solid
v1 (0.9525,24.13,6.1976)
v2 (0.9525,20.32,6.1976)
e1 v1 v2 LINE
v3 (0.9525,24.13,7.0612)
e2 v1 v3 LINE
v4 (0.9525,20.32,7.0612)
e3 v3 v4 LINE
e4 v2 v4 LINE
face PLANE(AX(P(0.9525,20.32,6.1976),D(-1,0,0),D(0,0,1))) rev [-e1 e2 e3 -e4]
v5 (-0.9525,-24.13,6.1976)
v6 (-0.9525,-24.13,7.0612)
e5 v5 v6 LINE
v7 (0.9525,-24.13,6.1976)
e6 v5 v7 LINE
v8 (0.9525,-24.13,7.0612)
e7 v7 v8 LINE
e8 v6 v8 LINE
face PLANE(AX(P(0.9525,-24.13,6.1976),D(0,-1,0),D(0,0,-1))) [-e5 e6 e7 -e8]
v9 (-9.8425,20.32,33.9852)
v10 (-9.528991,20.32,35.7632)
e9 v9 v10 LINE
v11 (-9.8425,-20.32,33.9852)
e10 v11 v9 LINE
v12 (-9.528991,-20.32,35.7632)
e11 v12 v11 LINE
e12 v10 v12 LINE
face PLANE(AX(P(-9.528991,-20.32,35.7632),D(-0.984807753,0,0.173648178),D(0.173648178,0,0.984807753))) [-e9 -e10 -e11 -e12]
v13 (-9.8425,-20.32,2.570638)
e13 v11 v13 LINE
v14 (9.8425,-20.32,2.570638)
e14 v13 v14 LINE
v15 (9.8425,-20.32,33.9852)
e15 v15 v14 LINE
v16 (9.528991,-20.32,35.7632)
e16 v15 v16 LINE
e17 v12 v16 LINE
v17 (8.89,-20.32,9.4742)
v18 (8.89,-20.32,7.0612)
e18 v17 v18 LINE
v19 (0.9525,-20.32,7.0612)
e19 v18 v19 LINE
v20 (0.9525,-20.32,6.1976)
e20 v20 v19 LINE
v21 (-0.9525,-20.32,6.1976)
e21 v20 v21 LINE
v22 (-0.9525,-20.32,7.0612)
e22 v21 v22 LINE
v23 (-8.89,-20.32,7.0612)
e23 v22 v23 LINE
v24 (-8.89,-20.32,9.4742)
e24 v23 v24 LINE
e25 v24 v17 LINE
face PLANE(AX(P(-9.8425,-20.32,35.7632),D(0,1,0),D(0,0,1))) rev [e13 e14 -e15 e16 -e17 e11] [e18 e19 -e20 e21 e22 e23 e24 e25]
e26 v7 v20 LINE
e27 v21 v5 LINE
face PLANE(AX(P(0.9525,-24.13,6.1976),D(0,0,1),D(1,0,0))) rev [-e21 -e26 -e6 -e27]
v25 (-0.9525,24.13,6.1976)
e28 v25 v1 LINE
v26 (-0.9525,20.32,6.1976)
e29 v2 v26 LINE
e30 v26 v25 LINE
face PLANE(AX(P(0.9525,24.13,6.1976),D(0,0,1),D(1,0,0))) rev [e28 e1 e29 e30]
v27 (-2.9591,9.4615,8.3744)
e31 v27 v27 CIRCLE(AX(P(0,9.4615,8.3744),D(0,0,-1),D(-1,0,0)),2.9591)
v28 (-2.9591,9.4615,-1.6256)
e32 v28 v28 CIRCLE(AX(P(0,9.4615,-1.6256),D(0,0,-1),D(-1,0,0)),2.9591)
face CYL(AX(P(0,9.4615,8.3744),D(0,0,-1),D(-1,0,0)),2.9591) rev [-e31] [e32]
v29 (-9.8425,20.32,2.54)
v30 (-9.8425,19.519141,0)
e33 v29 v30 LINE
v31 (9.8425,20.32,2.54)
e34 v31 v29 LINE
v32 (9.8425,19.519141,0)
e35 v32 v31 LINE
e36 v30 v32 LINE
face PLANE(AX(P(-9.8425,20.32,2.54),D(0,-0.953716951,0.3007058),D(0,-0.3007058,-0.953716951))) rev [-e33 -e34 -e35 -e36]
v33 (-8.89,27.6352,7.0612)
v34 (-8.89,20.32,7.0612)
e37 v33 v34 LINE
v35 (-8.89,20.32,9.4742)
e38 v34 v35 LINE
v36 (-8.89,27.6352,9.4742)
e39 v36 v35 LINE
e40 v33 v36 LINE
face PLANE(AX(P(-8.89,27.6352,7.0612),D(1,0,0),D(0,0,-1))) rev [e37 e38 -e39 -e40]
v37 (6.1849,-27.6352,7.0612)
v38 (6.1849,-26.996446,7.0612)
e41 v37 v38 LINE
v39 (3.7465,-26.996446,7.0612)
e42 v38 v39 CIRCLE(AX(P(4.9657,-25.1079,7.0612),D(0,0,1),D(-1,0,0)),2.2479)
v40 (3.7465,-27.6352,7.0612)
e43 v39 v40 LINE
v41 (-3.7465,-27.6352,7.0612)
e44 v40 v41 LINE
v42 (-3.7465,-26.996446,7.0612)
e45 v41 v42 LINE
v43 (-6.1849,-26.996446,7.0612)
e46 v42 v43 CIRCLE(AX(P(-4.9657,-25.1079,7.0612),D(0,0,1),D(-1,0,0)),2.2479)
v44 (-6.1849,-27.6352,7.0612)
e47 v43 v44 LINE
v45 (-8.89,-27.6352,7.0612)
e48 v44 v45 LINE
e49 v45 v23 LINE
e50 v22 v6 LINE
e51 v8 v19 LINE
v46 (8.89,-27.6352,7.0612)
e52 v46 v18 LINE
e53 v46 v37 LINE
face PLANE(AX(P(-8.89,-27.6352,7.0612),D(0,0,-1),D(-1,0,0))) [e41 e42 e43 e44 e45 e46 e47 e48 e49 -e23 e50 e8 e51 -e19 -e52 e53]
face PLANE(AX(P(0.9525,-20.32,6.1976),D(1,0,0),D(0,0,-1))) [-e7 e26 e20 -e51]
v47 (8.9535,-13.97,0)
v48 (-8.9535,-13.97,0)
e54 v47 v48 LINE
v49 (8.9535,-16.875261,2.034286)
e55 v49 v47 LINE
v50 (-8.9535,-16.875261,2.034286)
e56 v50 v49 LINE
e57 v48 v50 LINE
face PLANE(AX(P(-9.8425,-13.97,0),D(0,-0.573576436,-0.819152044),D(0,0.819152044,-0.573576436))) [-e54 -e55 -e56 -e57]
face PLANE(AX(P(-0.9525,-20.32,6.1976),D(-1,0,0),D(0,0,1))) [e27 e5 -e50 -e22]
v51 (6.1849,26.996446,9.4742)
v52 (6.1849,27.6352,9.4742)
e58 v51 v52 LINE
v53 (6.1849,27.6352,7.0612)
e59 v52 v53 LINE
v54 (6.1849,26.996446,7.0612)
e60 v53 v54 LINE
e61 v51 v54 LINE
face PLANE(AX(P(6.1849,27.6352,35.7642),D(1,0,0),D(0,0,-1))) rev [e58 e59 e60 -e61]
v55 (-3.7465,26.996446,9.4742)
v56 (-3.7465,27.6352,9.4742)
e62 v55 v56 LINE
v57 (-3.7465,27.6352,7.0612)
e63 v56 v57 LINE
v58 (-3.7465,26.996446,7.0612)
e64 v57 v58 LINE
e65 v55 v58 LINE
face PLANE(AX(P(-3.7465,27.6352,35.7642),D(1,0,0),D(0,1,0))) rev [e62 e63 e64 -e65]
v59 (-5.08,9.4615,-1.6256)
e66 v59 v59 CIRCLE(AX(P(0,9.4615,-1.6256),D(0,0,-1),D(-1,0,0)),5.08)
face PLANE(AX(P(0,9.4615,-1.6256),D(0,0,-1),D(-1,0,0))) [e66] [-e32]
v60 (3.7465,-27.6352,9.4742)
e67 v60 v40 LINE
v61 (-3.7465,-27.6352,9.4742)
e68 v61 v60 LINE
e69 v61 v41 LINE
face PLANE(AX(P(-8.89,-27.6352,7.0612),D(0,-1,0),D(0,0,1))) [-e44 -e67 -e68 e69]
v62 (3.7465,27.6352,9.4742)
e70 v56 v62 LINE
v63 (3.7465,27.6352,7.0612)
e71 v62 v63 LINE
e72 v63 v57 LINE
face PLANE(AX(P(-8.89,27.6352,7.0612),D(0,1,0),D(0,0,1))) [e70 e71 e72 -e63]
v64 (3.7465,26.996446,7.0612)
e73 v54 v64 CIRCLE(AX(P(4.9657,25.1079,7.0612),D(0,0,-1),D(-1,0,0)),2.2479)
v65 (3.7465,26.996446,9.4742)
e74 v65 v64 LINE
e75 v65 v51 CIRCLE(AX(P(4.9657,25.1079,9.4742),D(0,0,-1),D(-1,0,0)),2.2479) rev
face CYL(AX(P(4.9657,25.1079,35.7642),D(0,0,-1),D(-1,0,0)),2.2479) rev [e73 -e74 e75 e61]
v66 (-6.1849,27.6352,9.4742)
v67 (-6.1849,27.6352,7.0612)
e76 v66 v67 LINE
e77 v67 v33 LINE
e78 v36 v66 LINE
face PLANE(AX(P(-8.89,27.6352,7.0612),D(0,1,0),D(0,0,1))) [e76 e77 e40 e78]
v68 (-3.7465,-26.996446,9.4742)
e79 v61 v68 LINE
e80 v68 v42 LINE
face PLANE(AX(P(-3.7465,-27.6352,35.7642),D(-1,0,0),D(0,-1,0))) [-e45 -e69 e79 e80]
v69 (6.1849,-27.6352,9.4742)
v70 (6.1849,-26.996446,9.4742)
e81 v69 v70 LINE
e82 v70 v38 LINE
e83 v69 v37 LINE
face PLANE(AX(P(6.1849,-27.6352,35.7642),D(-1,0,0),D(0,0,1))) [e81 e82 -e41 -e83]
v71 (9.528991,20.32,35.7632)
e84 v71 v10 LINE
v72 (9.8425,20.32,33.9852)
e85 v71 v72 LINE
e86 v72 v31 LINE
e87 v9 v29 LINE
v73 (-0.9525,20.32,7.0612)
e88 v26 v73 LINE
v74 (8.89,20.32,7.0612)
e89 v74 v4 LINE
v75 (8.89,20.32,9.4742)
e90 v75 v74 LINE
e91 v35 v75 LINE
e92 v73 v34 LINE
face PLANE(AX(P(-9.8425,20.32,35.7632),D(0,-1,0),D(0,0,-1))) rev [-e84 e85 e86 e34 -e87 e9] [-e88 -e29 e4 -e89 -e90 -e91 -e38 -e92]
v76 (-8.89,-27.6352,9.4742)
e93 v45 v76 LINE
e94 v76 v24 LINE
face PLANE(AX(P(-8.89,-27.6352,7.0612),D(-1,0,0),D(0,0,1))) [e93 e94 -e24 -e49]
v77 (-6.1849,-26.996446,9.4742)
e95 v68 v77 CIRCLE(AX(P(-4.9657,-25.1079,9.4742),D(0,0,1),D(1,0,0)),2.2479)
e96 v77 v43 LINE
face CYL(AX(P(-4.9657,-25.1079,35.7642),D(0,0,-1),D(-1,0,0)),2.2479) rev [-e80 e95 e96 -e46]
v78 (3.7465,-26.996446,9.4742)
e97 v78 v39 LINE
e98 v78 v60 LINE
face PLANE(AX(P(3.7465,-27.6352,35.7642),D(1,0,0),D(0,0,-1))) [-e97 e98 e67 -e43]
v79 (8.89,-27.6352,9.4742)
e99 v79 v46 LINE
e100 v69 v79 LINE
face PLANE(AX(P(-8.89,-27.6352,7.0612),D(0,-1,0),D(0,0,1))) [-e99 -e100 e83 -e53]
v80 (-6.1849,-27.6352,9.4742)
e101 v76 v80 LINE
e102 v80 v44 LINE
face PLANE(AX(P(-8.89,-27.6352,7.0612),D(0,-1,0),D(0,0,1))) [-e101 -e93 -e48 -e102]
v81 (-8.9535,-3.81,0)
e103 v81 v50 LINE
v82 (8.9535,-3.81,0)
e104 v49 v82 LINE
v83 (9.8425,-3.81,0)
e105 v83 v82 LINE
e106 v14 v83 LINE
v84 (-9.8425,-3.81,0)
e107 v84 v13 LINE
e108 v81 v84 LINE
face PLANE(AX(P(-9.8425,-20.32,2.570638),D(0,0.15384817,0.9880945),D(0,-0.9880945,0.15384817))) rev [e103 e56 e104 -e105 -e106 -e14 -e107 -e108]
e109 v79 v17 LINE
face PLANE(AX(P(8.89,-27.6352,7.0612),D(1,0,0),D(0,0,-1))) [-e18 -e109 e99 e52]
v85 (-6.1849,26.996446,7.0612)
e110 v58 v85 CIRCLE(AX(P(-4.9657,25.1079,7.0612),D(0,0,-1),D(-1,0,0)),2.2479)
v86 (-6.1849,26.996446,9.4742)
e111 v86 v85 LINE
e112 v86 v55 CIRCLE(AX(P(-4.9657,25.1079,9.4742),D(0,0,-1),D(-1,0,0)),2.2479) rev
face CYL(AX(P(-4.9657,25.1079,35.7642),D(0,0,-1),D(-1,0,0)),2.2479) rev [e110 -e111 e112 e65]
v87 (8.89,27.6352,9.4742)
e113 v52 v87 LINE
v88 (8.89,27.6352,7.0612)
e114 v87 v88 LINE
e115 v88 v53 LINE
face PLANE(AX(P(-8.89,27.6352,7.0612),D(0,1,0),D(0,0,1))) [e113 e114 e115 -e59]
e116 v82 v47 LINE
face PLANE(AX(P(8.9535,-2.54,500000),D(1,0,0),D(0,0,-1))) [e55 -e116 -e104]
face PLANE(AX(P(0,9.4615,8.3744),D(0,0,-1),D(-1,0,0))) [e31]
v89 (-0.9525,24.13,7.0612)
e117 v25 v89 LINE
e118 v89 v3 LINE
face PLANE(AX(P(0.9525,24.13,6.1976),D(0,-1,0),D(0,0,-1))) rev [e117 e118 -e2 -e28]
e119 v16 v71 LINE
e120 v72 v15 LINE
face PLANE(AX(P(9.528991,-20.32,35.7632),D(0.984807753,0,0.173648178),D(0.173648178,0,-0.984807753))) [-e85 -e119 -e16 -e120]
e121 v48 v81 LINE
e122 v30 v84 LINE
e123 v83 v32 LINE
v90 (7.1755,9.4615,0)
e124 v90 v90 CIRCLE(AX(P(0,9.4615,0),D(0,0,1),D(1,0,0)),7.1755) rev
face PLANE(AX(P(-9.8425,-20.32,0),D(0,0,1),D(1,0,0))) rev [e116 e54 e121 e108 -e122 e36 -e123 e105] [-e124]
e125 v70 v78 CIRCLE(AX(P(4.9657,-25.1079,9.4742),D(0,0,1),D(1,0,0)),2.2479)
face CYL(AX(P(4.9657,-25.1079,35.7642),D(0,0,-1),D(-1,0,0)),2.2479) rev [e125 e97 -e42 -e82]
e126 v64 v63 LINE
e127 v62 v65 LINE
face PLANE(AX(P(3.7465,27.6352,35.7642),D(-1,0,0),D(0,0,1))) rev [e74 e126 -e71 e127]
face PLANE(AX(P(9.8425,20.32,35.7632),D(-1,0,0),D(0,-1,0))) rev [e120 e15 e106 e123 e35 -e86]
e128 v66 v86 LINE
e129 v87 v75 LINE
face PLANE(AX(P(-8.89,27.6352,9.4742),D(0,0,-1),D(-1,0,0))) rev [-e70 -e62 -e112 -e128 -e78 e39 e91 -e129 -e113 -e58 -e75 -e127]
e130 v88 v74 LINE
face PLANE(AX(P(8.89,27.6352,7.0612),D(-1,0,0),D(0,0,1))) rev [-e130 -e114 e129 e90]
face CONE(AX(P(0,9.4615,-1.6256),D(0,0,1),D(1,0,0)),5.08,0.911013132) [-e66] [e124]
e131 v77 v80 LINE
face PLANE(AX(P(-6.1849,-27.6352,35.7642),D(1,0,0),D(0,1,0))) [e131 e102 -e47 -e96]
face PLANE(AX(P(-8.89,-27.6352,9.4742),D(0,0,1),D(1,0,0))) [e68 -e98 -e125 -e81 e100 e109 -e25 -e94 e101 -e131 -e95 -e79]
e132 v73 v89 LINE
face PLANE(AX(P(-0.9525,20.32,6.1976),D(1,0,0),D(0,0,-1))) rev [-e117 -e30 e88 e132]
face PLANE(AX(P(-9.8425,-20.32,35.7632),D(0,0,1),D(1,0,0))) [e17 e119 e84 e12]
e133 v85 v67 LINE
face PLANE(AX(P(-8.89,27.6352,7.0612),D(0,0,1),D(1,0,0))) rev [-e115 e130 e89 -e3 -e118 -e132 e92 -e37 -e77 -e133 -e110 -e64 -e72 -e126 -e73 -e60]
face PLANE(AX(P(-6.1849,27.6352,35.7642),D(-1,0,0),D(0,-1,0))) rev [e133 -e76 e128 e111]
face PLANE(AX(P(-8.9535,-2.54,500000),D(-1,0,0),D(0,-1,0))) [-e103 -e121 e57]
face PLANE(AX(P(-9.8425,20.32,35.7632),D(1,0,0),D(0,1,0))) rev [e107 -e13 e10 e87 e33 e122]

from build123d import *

# Parameters (mm, degrees)
SKETCH1_W          = 19.685
SKETCH1_H          = 40.64
EXTRUDE1_DEPTH     = 35.7632
CHAMFER1_SIZE      = 1.778
CHAMFER1_SIZE2     = 0.313509372
CHAMFER2_SIZE      = 1.778
CHAMFER2_SIZE2     = 0.313509372
CHAMFER3_SIZE      = 16.51
CHAMFER3_SIZE2     = 2.570638016
EXTRUDE2_REACH     = 44.294
SKETCH2_W          = 17.907
SKETCH2_H          = 14.732
CHAMFER4_SIZE      = 3.302
CHAMFER4_SIZE_2    = 2.312085291
SKETCH3_R          = 7.1755
EXTRUDE3_DEPTH     = 1.6256
CHAMFER5_SIZE      = 2.54
CHAMFER5_SIZE2     = 0.800858924
CHAMFER6_SIZE2     = 2.0955
CHAMFER6_SIZE      = 1.6256
SKETCH4_R          = 2.9591
CUT_EXTRUDE1_DEPTH = 10
SKETCH5_W          = 17.78
SKETCH5_H          = 2.413
EXTRUDE4_DEPTH     = 7.3152
CUT_EXTRUDE2_REACH = 43.041
SKETCH8_W          = 1.905
SKETCH8_H          = 3.81
EXTRUDE5_DEPTH     = 0.8636


# Some blends are built 0.0001 mm under size
with BuildPart() as part:
    # Sketch1 → Extrude1 (new body)
    with BuildSketch(Plane.XY):
        Rectangle(SKETCH1_W, SKETCH1_H)
    extrude(amount=EXTRUDE1_DEPTH)

    # Chamfer1
    chamfer1_edges = [part.edges().sort_by_distance(p)[0] for p in [
        (9.8425, 0, 35.7632),
    ]]
    chamfer1_side = [part.faces().sort_by_distance(p)[0] for p in [
        (9.8425, 0, 17.8816),
    ]]
    chamfer(chamfer1_edges, length=CHAMFER1_SIZE, length2=CHAMFER1_SIZE2, reference=chamfer1_side[0])

    # Chamfer2
    chamfer2_edges = [part.edges().sort_by_distance(p)[0] for p in [
        (-9.8425, 0, 35.7632),
    ]]
    chamfer2_side = [part.faces().sort_by_distance(p)[0] for p in [
        (-9.8425, 0, 17.8816),
    ]]
    chamfer(chamfer2_edges, length=CHAMFER2_SIZE, length2=CHAMFER2_SIZE2, reference=chamfer2_side[0])

    # Chamfer3
    chamfer3_edges = [part.edges().sort_by_distance(p)[0] for p in [
        (0, -20.32, 0),
    ]]
    chamfer3_side = [part.faces().sort_by_distance(p)[0] for p in [
        (0, 0, 0),
    ]]
    chamfer(chamfer3_edges, length=CHAMFER3_SIZE, length2=CHAMFER3_SIZE2, reference=chamfer3_side[0])

    # Sketch2 → Extrude2 (add, up to next)
    with BuildSketch(Plane(origin=(0, 0, 0), x_dir=(-1, 0, 0), z_dir=(0, 0, -1)), mode=Mode.PRIVATE) as extrude2_sk1:
        with Locations((0, -9.906)):
            Rectangle(SKETCH2_W, SKETCH2_H)
    extrude2_tool1 = extrude(extrude2_sk1.sketch, amount=-EXTRUDE2_REACH, mode=Mode.PRIVATE) - part.part
    add(extrude2_tool1.solids().sort_by_distance((0, -9.906, 0))[0])

    # Chamfer4
    # the kernel refuses this chamfer: 3.302, 2.312085291 mm, written as the material it takes off along each edge
    with BuildSketch(Plane(origin=(-17.481087464, -17.272, 0), x_dir=(0, 0.99975333476413, -0.022209674198457065), z_dir=(1, 0, 0))) as chamfer4_piece_1_section:
        Polygon((CHAMFER4_SIZE * 0.999753334764, CHAMFER4_SIZE * 0.0222096741985), (-CHAMFER4_SIZE_2 * 0.0222096742001, CHAMFER4_SIZE_2 * 0.999753334837), (0, 0), align=None)
    chamfer4_piece_1 = extrude(amount=34.962174929, mode=Mode.PRIVATE)
    chamfer4_piece_1 = split(chamfer4_piece_1, bisect_by=Plane(origin=(0, -15.96847592, 1.893097542), z_dir=(0, -0.15384816987279037, -0.9880944998464434)), keep=Keep.TOP, mode=Mode.PRIVATE)
    add(chamfer4_piece_1, mode=Mode.SUBTRACT)

    # Sketch3 → Extrude3 (add)
    with BuildSketch(Plane(origin=(0, 0, 0), x_dir=(-1, 0, 0), z_dir=(0, 0, -1))):
        with Locations(Location((0, 9.4615, 0), (0, 0, 180))):
            Circle(SKETCH3_R)
    extrude(amount=EXTRUDE3_DEPTH)

    # Chamfer5
    chamfer5_edges = [part.edges().sort_by_distance(p)[0] for p in [
        (0, 20.32, 0),
    ]]
    chamfer5_side = [part.faces().sort_by_distance(p)[0] for p in [
        (0, 20.32, 17.867899933),
    ]]
    chamfer(chamfer5_edges, length=CHAMFER5_SIZE, length2=CHAMFER5_SIZE2, reference=chamfer5_side[0])

    # Chamfer6
    chamfer6_edges = [part.edges().sort_by_distance(p)[0] for p in [
        (-7.1755, 9.4615, -1.6256),
    ]]
    chamfer6_side = [part.faces().sort_by_distance(p)[0] for p in [
        (-7.1755, 9.4615, -1.593088),
    ]]
    chamfer(chamfer6_edges, length=CHAMFER6_SIZE - 0.0001, length2=CHAMFER6_SIZE2 - 0.0001, reference=chamfer6_side[0])  # a hair under: the kernel refuses the full size

    # Sketch4 → Cut-Extrude1 (cut)
    with BuildSketch(Plane(origin=(0, 0, -1.6256), x_dir=(-1, 0, 0), z_dir=(0, 0, -1))):
        with Locations((0, 9.4615)):
            Circle(SKETCH4_R)
    extrude(amount=-CUT_EXTRUDE1_DEPTH, mode=Mode.SUBTRACT)

    # Sketch5 → Extrude4 (add)
    with BuildSketch(Plane(origin=(0, 20.32, 0), x_dir=(1, 0, 0), z_dir=(0, 1, 0))):
        with Locations((0, -8.2677)):
            Rectangle(SKETCH5_W, SKETCH5_H)
    extrude4 = extrude(amount=EXTRUDE4_DEPTH)

    # Sketch6 → Cut-Extrude2 (cut, up to next)
    with BuildSketch(Plane(origin=(0, 0, 7.0612), x_dir=(-1, 0, 0), z_dir=(0, 0, -1)), mode=Mode.PRIVATE) as cut_extrude2_sk1:
        with BuildLine():
            Line((-6.1849, 27.6352), (-3.7465, 27.6352))
            Line((-3.7465, 27.6352), (-3.7465, 26.996445941))
            ThreePointArc((-3.7465, 26.996445941), (-4.9657, 22.86), (-6.1849, 26.996445941))
            Line((-6.1849, 26.996445941), (-6.1849, 27.6352))
        make_face()
    cut_extrude2_tool1 = extrude(cut_extrude2_sk1.sketch, amount=-CUT_EXTRUDE2_REACH, mode=Mode.PRIVATE) & part.part
    # Sketch6 → Cut-Extrude2 (cut, up to next)
    with BuildSketch(Plane(origin=(0, 0, 7.0612), x_dir=(-1, 0, 0), z_dir=(0, 0, -1)), mode=Mode.PRIVATE) as cut_extrude2_sk2:
        with BuildLine():
            Line((3.7465, 27.6352), (6.1849, 27.6352))
            Line((6.1849, 27.6352), (6.1849, 26.996445941))
            ThreePointArc((6.1849, 26.996445941), (4.9657, 22.86), (3.7465, 26.996445941))
            Line((3.7465, 26.996445941), (3.7465, 27.6352))
        make_face()
    cut_extrude2_tool2 = extrude(cut_extrude2_sk2.sketch, amount=-CUT_EXTRUDE2_REACH, mode=Mode.PRIVATE) & part.part
    cut_extrude2_1 = cut_extrude2_tool1.solids().sort_by_distance((4.9657, 25.240383, 7.0612))[0]
    add(cut_extrude2_1, mode=Mode.SUBTRACT)
    cut_extrude2_2 = cut_extrude2_tool2.solids().sort_by_distance((-4.9657, 25.240383, 7.0612))[0]
    add(cut_extrude2_2, mode=Mode.SUBTRACT)
    cut_extrude2 = cut_extrude2_1 + cut_extrude2_2  # Cut-Extrude2 as one shape, for the pattern or mirror that repeats it

    # Sketch8 → Extrude5 (add)
    with BuildSketch(Plane(origin=(0, 0, 7.0612), x_dir=(-1, 0, 0), z_dir=(0, 0, -1))):
        with Locations((0, 22.225)):
            Rectangle(SKETCH8_W, SKETCH8_H)
    extrude5 = extrude(amount=EXTRUDE5_DEPTH)

    # Mirror1: Extrude4, Cut-Extrude2, Extrude5 across plane
    add(extrude4.mirror(Plane.ZX))
    add(cut_extrude2.mirror(Plane.ZX), mode=Mode.SUBTRACT)
    add(extrude5.mirror(Plane.ZX))


solid = part.part
